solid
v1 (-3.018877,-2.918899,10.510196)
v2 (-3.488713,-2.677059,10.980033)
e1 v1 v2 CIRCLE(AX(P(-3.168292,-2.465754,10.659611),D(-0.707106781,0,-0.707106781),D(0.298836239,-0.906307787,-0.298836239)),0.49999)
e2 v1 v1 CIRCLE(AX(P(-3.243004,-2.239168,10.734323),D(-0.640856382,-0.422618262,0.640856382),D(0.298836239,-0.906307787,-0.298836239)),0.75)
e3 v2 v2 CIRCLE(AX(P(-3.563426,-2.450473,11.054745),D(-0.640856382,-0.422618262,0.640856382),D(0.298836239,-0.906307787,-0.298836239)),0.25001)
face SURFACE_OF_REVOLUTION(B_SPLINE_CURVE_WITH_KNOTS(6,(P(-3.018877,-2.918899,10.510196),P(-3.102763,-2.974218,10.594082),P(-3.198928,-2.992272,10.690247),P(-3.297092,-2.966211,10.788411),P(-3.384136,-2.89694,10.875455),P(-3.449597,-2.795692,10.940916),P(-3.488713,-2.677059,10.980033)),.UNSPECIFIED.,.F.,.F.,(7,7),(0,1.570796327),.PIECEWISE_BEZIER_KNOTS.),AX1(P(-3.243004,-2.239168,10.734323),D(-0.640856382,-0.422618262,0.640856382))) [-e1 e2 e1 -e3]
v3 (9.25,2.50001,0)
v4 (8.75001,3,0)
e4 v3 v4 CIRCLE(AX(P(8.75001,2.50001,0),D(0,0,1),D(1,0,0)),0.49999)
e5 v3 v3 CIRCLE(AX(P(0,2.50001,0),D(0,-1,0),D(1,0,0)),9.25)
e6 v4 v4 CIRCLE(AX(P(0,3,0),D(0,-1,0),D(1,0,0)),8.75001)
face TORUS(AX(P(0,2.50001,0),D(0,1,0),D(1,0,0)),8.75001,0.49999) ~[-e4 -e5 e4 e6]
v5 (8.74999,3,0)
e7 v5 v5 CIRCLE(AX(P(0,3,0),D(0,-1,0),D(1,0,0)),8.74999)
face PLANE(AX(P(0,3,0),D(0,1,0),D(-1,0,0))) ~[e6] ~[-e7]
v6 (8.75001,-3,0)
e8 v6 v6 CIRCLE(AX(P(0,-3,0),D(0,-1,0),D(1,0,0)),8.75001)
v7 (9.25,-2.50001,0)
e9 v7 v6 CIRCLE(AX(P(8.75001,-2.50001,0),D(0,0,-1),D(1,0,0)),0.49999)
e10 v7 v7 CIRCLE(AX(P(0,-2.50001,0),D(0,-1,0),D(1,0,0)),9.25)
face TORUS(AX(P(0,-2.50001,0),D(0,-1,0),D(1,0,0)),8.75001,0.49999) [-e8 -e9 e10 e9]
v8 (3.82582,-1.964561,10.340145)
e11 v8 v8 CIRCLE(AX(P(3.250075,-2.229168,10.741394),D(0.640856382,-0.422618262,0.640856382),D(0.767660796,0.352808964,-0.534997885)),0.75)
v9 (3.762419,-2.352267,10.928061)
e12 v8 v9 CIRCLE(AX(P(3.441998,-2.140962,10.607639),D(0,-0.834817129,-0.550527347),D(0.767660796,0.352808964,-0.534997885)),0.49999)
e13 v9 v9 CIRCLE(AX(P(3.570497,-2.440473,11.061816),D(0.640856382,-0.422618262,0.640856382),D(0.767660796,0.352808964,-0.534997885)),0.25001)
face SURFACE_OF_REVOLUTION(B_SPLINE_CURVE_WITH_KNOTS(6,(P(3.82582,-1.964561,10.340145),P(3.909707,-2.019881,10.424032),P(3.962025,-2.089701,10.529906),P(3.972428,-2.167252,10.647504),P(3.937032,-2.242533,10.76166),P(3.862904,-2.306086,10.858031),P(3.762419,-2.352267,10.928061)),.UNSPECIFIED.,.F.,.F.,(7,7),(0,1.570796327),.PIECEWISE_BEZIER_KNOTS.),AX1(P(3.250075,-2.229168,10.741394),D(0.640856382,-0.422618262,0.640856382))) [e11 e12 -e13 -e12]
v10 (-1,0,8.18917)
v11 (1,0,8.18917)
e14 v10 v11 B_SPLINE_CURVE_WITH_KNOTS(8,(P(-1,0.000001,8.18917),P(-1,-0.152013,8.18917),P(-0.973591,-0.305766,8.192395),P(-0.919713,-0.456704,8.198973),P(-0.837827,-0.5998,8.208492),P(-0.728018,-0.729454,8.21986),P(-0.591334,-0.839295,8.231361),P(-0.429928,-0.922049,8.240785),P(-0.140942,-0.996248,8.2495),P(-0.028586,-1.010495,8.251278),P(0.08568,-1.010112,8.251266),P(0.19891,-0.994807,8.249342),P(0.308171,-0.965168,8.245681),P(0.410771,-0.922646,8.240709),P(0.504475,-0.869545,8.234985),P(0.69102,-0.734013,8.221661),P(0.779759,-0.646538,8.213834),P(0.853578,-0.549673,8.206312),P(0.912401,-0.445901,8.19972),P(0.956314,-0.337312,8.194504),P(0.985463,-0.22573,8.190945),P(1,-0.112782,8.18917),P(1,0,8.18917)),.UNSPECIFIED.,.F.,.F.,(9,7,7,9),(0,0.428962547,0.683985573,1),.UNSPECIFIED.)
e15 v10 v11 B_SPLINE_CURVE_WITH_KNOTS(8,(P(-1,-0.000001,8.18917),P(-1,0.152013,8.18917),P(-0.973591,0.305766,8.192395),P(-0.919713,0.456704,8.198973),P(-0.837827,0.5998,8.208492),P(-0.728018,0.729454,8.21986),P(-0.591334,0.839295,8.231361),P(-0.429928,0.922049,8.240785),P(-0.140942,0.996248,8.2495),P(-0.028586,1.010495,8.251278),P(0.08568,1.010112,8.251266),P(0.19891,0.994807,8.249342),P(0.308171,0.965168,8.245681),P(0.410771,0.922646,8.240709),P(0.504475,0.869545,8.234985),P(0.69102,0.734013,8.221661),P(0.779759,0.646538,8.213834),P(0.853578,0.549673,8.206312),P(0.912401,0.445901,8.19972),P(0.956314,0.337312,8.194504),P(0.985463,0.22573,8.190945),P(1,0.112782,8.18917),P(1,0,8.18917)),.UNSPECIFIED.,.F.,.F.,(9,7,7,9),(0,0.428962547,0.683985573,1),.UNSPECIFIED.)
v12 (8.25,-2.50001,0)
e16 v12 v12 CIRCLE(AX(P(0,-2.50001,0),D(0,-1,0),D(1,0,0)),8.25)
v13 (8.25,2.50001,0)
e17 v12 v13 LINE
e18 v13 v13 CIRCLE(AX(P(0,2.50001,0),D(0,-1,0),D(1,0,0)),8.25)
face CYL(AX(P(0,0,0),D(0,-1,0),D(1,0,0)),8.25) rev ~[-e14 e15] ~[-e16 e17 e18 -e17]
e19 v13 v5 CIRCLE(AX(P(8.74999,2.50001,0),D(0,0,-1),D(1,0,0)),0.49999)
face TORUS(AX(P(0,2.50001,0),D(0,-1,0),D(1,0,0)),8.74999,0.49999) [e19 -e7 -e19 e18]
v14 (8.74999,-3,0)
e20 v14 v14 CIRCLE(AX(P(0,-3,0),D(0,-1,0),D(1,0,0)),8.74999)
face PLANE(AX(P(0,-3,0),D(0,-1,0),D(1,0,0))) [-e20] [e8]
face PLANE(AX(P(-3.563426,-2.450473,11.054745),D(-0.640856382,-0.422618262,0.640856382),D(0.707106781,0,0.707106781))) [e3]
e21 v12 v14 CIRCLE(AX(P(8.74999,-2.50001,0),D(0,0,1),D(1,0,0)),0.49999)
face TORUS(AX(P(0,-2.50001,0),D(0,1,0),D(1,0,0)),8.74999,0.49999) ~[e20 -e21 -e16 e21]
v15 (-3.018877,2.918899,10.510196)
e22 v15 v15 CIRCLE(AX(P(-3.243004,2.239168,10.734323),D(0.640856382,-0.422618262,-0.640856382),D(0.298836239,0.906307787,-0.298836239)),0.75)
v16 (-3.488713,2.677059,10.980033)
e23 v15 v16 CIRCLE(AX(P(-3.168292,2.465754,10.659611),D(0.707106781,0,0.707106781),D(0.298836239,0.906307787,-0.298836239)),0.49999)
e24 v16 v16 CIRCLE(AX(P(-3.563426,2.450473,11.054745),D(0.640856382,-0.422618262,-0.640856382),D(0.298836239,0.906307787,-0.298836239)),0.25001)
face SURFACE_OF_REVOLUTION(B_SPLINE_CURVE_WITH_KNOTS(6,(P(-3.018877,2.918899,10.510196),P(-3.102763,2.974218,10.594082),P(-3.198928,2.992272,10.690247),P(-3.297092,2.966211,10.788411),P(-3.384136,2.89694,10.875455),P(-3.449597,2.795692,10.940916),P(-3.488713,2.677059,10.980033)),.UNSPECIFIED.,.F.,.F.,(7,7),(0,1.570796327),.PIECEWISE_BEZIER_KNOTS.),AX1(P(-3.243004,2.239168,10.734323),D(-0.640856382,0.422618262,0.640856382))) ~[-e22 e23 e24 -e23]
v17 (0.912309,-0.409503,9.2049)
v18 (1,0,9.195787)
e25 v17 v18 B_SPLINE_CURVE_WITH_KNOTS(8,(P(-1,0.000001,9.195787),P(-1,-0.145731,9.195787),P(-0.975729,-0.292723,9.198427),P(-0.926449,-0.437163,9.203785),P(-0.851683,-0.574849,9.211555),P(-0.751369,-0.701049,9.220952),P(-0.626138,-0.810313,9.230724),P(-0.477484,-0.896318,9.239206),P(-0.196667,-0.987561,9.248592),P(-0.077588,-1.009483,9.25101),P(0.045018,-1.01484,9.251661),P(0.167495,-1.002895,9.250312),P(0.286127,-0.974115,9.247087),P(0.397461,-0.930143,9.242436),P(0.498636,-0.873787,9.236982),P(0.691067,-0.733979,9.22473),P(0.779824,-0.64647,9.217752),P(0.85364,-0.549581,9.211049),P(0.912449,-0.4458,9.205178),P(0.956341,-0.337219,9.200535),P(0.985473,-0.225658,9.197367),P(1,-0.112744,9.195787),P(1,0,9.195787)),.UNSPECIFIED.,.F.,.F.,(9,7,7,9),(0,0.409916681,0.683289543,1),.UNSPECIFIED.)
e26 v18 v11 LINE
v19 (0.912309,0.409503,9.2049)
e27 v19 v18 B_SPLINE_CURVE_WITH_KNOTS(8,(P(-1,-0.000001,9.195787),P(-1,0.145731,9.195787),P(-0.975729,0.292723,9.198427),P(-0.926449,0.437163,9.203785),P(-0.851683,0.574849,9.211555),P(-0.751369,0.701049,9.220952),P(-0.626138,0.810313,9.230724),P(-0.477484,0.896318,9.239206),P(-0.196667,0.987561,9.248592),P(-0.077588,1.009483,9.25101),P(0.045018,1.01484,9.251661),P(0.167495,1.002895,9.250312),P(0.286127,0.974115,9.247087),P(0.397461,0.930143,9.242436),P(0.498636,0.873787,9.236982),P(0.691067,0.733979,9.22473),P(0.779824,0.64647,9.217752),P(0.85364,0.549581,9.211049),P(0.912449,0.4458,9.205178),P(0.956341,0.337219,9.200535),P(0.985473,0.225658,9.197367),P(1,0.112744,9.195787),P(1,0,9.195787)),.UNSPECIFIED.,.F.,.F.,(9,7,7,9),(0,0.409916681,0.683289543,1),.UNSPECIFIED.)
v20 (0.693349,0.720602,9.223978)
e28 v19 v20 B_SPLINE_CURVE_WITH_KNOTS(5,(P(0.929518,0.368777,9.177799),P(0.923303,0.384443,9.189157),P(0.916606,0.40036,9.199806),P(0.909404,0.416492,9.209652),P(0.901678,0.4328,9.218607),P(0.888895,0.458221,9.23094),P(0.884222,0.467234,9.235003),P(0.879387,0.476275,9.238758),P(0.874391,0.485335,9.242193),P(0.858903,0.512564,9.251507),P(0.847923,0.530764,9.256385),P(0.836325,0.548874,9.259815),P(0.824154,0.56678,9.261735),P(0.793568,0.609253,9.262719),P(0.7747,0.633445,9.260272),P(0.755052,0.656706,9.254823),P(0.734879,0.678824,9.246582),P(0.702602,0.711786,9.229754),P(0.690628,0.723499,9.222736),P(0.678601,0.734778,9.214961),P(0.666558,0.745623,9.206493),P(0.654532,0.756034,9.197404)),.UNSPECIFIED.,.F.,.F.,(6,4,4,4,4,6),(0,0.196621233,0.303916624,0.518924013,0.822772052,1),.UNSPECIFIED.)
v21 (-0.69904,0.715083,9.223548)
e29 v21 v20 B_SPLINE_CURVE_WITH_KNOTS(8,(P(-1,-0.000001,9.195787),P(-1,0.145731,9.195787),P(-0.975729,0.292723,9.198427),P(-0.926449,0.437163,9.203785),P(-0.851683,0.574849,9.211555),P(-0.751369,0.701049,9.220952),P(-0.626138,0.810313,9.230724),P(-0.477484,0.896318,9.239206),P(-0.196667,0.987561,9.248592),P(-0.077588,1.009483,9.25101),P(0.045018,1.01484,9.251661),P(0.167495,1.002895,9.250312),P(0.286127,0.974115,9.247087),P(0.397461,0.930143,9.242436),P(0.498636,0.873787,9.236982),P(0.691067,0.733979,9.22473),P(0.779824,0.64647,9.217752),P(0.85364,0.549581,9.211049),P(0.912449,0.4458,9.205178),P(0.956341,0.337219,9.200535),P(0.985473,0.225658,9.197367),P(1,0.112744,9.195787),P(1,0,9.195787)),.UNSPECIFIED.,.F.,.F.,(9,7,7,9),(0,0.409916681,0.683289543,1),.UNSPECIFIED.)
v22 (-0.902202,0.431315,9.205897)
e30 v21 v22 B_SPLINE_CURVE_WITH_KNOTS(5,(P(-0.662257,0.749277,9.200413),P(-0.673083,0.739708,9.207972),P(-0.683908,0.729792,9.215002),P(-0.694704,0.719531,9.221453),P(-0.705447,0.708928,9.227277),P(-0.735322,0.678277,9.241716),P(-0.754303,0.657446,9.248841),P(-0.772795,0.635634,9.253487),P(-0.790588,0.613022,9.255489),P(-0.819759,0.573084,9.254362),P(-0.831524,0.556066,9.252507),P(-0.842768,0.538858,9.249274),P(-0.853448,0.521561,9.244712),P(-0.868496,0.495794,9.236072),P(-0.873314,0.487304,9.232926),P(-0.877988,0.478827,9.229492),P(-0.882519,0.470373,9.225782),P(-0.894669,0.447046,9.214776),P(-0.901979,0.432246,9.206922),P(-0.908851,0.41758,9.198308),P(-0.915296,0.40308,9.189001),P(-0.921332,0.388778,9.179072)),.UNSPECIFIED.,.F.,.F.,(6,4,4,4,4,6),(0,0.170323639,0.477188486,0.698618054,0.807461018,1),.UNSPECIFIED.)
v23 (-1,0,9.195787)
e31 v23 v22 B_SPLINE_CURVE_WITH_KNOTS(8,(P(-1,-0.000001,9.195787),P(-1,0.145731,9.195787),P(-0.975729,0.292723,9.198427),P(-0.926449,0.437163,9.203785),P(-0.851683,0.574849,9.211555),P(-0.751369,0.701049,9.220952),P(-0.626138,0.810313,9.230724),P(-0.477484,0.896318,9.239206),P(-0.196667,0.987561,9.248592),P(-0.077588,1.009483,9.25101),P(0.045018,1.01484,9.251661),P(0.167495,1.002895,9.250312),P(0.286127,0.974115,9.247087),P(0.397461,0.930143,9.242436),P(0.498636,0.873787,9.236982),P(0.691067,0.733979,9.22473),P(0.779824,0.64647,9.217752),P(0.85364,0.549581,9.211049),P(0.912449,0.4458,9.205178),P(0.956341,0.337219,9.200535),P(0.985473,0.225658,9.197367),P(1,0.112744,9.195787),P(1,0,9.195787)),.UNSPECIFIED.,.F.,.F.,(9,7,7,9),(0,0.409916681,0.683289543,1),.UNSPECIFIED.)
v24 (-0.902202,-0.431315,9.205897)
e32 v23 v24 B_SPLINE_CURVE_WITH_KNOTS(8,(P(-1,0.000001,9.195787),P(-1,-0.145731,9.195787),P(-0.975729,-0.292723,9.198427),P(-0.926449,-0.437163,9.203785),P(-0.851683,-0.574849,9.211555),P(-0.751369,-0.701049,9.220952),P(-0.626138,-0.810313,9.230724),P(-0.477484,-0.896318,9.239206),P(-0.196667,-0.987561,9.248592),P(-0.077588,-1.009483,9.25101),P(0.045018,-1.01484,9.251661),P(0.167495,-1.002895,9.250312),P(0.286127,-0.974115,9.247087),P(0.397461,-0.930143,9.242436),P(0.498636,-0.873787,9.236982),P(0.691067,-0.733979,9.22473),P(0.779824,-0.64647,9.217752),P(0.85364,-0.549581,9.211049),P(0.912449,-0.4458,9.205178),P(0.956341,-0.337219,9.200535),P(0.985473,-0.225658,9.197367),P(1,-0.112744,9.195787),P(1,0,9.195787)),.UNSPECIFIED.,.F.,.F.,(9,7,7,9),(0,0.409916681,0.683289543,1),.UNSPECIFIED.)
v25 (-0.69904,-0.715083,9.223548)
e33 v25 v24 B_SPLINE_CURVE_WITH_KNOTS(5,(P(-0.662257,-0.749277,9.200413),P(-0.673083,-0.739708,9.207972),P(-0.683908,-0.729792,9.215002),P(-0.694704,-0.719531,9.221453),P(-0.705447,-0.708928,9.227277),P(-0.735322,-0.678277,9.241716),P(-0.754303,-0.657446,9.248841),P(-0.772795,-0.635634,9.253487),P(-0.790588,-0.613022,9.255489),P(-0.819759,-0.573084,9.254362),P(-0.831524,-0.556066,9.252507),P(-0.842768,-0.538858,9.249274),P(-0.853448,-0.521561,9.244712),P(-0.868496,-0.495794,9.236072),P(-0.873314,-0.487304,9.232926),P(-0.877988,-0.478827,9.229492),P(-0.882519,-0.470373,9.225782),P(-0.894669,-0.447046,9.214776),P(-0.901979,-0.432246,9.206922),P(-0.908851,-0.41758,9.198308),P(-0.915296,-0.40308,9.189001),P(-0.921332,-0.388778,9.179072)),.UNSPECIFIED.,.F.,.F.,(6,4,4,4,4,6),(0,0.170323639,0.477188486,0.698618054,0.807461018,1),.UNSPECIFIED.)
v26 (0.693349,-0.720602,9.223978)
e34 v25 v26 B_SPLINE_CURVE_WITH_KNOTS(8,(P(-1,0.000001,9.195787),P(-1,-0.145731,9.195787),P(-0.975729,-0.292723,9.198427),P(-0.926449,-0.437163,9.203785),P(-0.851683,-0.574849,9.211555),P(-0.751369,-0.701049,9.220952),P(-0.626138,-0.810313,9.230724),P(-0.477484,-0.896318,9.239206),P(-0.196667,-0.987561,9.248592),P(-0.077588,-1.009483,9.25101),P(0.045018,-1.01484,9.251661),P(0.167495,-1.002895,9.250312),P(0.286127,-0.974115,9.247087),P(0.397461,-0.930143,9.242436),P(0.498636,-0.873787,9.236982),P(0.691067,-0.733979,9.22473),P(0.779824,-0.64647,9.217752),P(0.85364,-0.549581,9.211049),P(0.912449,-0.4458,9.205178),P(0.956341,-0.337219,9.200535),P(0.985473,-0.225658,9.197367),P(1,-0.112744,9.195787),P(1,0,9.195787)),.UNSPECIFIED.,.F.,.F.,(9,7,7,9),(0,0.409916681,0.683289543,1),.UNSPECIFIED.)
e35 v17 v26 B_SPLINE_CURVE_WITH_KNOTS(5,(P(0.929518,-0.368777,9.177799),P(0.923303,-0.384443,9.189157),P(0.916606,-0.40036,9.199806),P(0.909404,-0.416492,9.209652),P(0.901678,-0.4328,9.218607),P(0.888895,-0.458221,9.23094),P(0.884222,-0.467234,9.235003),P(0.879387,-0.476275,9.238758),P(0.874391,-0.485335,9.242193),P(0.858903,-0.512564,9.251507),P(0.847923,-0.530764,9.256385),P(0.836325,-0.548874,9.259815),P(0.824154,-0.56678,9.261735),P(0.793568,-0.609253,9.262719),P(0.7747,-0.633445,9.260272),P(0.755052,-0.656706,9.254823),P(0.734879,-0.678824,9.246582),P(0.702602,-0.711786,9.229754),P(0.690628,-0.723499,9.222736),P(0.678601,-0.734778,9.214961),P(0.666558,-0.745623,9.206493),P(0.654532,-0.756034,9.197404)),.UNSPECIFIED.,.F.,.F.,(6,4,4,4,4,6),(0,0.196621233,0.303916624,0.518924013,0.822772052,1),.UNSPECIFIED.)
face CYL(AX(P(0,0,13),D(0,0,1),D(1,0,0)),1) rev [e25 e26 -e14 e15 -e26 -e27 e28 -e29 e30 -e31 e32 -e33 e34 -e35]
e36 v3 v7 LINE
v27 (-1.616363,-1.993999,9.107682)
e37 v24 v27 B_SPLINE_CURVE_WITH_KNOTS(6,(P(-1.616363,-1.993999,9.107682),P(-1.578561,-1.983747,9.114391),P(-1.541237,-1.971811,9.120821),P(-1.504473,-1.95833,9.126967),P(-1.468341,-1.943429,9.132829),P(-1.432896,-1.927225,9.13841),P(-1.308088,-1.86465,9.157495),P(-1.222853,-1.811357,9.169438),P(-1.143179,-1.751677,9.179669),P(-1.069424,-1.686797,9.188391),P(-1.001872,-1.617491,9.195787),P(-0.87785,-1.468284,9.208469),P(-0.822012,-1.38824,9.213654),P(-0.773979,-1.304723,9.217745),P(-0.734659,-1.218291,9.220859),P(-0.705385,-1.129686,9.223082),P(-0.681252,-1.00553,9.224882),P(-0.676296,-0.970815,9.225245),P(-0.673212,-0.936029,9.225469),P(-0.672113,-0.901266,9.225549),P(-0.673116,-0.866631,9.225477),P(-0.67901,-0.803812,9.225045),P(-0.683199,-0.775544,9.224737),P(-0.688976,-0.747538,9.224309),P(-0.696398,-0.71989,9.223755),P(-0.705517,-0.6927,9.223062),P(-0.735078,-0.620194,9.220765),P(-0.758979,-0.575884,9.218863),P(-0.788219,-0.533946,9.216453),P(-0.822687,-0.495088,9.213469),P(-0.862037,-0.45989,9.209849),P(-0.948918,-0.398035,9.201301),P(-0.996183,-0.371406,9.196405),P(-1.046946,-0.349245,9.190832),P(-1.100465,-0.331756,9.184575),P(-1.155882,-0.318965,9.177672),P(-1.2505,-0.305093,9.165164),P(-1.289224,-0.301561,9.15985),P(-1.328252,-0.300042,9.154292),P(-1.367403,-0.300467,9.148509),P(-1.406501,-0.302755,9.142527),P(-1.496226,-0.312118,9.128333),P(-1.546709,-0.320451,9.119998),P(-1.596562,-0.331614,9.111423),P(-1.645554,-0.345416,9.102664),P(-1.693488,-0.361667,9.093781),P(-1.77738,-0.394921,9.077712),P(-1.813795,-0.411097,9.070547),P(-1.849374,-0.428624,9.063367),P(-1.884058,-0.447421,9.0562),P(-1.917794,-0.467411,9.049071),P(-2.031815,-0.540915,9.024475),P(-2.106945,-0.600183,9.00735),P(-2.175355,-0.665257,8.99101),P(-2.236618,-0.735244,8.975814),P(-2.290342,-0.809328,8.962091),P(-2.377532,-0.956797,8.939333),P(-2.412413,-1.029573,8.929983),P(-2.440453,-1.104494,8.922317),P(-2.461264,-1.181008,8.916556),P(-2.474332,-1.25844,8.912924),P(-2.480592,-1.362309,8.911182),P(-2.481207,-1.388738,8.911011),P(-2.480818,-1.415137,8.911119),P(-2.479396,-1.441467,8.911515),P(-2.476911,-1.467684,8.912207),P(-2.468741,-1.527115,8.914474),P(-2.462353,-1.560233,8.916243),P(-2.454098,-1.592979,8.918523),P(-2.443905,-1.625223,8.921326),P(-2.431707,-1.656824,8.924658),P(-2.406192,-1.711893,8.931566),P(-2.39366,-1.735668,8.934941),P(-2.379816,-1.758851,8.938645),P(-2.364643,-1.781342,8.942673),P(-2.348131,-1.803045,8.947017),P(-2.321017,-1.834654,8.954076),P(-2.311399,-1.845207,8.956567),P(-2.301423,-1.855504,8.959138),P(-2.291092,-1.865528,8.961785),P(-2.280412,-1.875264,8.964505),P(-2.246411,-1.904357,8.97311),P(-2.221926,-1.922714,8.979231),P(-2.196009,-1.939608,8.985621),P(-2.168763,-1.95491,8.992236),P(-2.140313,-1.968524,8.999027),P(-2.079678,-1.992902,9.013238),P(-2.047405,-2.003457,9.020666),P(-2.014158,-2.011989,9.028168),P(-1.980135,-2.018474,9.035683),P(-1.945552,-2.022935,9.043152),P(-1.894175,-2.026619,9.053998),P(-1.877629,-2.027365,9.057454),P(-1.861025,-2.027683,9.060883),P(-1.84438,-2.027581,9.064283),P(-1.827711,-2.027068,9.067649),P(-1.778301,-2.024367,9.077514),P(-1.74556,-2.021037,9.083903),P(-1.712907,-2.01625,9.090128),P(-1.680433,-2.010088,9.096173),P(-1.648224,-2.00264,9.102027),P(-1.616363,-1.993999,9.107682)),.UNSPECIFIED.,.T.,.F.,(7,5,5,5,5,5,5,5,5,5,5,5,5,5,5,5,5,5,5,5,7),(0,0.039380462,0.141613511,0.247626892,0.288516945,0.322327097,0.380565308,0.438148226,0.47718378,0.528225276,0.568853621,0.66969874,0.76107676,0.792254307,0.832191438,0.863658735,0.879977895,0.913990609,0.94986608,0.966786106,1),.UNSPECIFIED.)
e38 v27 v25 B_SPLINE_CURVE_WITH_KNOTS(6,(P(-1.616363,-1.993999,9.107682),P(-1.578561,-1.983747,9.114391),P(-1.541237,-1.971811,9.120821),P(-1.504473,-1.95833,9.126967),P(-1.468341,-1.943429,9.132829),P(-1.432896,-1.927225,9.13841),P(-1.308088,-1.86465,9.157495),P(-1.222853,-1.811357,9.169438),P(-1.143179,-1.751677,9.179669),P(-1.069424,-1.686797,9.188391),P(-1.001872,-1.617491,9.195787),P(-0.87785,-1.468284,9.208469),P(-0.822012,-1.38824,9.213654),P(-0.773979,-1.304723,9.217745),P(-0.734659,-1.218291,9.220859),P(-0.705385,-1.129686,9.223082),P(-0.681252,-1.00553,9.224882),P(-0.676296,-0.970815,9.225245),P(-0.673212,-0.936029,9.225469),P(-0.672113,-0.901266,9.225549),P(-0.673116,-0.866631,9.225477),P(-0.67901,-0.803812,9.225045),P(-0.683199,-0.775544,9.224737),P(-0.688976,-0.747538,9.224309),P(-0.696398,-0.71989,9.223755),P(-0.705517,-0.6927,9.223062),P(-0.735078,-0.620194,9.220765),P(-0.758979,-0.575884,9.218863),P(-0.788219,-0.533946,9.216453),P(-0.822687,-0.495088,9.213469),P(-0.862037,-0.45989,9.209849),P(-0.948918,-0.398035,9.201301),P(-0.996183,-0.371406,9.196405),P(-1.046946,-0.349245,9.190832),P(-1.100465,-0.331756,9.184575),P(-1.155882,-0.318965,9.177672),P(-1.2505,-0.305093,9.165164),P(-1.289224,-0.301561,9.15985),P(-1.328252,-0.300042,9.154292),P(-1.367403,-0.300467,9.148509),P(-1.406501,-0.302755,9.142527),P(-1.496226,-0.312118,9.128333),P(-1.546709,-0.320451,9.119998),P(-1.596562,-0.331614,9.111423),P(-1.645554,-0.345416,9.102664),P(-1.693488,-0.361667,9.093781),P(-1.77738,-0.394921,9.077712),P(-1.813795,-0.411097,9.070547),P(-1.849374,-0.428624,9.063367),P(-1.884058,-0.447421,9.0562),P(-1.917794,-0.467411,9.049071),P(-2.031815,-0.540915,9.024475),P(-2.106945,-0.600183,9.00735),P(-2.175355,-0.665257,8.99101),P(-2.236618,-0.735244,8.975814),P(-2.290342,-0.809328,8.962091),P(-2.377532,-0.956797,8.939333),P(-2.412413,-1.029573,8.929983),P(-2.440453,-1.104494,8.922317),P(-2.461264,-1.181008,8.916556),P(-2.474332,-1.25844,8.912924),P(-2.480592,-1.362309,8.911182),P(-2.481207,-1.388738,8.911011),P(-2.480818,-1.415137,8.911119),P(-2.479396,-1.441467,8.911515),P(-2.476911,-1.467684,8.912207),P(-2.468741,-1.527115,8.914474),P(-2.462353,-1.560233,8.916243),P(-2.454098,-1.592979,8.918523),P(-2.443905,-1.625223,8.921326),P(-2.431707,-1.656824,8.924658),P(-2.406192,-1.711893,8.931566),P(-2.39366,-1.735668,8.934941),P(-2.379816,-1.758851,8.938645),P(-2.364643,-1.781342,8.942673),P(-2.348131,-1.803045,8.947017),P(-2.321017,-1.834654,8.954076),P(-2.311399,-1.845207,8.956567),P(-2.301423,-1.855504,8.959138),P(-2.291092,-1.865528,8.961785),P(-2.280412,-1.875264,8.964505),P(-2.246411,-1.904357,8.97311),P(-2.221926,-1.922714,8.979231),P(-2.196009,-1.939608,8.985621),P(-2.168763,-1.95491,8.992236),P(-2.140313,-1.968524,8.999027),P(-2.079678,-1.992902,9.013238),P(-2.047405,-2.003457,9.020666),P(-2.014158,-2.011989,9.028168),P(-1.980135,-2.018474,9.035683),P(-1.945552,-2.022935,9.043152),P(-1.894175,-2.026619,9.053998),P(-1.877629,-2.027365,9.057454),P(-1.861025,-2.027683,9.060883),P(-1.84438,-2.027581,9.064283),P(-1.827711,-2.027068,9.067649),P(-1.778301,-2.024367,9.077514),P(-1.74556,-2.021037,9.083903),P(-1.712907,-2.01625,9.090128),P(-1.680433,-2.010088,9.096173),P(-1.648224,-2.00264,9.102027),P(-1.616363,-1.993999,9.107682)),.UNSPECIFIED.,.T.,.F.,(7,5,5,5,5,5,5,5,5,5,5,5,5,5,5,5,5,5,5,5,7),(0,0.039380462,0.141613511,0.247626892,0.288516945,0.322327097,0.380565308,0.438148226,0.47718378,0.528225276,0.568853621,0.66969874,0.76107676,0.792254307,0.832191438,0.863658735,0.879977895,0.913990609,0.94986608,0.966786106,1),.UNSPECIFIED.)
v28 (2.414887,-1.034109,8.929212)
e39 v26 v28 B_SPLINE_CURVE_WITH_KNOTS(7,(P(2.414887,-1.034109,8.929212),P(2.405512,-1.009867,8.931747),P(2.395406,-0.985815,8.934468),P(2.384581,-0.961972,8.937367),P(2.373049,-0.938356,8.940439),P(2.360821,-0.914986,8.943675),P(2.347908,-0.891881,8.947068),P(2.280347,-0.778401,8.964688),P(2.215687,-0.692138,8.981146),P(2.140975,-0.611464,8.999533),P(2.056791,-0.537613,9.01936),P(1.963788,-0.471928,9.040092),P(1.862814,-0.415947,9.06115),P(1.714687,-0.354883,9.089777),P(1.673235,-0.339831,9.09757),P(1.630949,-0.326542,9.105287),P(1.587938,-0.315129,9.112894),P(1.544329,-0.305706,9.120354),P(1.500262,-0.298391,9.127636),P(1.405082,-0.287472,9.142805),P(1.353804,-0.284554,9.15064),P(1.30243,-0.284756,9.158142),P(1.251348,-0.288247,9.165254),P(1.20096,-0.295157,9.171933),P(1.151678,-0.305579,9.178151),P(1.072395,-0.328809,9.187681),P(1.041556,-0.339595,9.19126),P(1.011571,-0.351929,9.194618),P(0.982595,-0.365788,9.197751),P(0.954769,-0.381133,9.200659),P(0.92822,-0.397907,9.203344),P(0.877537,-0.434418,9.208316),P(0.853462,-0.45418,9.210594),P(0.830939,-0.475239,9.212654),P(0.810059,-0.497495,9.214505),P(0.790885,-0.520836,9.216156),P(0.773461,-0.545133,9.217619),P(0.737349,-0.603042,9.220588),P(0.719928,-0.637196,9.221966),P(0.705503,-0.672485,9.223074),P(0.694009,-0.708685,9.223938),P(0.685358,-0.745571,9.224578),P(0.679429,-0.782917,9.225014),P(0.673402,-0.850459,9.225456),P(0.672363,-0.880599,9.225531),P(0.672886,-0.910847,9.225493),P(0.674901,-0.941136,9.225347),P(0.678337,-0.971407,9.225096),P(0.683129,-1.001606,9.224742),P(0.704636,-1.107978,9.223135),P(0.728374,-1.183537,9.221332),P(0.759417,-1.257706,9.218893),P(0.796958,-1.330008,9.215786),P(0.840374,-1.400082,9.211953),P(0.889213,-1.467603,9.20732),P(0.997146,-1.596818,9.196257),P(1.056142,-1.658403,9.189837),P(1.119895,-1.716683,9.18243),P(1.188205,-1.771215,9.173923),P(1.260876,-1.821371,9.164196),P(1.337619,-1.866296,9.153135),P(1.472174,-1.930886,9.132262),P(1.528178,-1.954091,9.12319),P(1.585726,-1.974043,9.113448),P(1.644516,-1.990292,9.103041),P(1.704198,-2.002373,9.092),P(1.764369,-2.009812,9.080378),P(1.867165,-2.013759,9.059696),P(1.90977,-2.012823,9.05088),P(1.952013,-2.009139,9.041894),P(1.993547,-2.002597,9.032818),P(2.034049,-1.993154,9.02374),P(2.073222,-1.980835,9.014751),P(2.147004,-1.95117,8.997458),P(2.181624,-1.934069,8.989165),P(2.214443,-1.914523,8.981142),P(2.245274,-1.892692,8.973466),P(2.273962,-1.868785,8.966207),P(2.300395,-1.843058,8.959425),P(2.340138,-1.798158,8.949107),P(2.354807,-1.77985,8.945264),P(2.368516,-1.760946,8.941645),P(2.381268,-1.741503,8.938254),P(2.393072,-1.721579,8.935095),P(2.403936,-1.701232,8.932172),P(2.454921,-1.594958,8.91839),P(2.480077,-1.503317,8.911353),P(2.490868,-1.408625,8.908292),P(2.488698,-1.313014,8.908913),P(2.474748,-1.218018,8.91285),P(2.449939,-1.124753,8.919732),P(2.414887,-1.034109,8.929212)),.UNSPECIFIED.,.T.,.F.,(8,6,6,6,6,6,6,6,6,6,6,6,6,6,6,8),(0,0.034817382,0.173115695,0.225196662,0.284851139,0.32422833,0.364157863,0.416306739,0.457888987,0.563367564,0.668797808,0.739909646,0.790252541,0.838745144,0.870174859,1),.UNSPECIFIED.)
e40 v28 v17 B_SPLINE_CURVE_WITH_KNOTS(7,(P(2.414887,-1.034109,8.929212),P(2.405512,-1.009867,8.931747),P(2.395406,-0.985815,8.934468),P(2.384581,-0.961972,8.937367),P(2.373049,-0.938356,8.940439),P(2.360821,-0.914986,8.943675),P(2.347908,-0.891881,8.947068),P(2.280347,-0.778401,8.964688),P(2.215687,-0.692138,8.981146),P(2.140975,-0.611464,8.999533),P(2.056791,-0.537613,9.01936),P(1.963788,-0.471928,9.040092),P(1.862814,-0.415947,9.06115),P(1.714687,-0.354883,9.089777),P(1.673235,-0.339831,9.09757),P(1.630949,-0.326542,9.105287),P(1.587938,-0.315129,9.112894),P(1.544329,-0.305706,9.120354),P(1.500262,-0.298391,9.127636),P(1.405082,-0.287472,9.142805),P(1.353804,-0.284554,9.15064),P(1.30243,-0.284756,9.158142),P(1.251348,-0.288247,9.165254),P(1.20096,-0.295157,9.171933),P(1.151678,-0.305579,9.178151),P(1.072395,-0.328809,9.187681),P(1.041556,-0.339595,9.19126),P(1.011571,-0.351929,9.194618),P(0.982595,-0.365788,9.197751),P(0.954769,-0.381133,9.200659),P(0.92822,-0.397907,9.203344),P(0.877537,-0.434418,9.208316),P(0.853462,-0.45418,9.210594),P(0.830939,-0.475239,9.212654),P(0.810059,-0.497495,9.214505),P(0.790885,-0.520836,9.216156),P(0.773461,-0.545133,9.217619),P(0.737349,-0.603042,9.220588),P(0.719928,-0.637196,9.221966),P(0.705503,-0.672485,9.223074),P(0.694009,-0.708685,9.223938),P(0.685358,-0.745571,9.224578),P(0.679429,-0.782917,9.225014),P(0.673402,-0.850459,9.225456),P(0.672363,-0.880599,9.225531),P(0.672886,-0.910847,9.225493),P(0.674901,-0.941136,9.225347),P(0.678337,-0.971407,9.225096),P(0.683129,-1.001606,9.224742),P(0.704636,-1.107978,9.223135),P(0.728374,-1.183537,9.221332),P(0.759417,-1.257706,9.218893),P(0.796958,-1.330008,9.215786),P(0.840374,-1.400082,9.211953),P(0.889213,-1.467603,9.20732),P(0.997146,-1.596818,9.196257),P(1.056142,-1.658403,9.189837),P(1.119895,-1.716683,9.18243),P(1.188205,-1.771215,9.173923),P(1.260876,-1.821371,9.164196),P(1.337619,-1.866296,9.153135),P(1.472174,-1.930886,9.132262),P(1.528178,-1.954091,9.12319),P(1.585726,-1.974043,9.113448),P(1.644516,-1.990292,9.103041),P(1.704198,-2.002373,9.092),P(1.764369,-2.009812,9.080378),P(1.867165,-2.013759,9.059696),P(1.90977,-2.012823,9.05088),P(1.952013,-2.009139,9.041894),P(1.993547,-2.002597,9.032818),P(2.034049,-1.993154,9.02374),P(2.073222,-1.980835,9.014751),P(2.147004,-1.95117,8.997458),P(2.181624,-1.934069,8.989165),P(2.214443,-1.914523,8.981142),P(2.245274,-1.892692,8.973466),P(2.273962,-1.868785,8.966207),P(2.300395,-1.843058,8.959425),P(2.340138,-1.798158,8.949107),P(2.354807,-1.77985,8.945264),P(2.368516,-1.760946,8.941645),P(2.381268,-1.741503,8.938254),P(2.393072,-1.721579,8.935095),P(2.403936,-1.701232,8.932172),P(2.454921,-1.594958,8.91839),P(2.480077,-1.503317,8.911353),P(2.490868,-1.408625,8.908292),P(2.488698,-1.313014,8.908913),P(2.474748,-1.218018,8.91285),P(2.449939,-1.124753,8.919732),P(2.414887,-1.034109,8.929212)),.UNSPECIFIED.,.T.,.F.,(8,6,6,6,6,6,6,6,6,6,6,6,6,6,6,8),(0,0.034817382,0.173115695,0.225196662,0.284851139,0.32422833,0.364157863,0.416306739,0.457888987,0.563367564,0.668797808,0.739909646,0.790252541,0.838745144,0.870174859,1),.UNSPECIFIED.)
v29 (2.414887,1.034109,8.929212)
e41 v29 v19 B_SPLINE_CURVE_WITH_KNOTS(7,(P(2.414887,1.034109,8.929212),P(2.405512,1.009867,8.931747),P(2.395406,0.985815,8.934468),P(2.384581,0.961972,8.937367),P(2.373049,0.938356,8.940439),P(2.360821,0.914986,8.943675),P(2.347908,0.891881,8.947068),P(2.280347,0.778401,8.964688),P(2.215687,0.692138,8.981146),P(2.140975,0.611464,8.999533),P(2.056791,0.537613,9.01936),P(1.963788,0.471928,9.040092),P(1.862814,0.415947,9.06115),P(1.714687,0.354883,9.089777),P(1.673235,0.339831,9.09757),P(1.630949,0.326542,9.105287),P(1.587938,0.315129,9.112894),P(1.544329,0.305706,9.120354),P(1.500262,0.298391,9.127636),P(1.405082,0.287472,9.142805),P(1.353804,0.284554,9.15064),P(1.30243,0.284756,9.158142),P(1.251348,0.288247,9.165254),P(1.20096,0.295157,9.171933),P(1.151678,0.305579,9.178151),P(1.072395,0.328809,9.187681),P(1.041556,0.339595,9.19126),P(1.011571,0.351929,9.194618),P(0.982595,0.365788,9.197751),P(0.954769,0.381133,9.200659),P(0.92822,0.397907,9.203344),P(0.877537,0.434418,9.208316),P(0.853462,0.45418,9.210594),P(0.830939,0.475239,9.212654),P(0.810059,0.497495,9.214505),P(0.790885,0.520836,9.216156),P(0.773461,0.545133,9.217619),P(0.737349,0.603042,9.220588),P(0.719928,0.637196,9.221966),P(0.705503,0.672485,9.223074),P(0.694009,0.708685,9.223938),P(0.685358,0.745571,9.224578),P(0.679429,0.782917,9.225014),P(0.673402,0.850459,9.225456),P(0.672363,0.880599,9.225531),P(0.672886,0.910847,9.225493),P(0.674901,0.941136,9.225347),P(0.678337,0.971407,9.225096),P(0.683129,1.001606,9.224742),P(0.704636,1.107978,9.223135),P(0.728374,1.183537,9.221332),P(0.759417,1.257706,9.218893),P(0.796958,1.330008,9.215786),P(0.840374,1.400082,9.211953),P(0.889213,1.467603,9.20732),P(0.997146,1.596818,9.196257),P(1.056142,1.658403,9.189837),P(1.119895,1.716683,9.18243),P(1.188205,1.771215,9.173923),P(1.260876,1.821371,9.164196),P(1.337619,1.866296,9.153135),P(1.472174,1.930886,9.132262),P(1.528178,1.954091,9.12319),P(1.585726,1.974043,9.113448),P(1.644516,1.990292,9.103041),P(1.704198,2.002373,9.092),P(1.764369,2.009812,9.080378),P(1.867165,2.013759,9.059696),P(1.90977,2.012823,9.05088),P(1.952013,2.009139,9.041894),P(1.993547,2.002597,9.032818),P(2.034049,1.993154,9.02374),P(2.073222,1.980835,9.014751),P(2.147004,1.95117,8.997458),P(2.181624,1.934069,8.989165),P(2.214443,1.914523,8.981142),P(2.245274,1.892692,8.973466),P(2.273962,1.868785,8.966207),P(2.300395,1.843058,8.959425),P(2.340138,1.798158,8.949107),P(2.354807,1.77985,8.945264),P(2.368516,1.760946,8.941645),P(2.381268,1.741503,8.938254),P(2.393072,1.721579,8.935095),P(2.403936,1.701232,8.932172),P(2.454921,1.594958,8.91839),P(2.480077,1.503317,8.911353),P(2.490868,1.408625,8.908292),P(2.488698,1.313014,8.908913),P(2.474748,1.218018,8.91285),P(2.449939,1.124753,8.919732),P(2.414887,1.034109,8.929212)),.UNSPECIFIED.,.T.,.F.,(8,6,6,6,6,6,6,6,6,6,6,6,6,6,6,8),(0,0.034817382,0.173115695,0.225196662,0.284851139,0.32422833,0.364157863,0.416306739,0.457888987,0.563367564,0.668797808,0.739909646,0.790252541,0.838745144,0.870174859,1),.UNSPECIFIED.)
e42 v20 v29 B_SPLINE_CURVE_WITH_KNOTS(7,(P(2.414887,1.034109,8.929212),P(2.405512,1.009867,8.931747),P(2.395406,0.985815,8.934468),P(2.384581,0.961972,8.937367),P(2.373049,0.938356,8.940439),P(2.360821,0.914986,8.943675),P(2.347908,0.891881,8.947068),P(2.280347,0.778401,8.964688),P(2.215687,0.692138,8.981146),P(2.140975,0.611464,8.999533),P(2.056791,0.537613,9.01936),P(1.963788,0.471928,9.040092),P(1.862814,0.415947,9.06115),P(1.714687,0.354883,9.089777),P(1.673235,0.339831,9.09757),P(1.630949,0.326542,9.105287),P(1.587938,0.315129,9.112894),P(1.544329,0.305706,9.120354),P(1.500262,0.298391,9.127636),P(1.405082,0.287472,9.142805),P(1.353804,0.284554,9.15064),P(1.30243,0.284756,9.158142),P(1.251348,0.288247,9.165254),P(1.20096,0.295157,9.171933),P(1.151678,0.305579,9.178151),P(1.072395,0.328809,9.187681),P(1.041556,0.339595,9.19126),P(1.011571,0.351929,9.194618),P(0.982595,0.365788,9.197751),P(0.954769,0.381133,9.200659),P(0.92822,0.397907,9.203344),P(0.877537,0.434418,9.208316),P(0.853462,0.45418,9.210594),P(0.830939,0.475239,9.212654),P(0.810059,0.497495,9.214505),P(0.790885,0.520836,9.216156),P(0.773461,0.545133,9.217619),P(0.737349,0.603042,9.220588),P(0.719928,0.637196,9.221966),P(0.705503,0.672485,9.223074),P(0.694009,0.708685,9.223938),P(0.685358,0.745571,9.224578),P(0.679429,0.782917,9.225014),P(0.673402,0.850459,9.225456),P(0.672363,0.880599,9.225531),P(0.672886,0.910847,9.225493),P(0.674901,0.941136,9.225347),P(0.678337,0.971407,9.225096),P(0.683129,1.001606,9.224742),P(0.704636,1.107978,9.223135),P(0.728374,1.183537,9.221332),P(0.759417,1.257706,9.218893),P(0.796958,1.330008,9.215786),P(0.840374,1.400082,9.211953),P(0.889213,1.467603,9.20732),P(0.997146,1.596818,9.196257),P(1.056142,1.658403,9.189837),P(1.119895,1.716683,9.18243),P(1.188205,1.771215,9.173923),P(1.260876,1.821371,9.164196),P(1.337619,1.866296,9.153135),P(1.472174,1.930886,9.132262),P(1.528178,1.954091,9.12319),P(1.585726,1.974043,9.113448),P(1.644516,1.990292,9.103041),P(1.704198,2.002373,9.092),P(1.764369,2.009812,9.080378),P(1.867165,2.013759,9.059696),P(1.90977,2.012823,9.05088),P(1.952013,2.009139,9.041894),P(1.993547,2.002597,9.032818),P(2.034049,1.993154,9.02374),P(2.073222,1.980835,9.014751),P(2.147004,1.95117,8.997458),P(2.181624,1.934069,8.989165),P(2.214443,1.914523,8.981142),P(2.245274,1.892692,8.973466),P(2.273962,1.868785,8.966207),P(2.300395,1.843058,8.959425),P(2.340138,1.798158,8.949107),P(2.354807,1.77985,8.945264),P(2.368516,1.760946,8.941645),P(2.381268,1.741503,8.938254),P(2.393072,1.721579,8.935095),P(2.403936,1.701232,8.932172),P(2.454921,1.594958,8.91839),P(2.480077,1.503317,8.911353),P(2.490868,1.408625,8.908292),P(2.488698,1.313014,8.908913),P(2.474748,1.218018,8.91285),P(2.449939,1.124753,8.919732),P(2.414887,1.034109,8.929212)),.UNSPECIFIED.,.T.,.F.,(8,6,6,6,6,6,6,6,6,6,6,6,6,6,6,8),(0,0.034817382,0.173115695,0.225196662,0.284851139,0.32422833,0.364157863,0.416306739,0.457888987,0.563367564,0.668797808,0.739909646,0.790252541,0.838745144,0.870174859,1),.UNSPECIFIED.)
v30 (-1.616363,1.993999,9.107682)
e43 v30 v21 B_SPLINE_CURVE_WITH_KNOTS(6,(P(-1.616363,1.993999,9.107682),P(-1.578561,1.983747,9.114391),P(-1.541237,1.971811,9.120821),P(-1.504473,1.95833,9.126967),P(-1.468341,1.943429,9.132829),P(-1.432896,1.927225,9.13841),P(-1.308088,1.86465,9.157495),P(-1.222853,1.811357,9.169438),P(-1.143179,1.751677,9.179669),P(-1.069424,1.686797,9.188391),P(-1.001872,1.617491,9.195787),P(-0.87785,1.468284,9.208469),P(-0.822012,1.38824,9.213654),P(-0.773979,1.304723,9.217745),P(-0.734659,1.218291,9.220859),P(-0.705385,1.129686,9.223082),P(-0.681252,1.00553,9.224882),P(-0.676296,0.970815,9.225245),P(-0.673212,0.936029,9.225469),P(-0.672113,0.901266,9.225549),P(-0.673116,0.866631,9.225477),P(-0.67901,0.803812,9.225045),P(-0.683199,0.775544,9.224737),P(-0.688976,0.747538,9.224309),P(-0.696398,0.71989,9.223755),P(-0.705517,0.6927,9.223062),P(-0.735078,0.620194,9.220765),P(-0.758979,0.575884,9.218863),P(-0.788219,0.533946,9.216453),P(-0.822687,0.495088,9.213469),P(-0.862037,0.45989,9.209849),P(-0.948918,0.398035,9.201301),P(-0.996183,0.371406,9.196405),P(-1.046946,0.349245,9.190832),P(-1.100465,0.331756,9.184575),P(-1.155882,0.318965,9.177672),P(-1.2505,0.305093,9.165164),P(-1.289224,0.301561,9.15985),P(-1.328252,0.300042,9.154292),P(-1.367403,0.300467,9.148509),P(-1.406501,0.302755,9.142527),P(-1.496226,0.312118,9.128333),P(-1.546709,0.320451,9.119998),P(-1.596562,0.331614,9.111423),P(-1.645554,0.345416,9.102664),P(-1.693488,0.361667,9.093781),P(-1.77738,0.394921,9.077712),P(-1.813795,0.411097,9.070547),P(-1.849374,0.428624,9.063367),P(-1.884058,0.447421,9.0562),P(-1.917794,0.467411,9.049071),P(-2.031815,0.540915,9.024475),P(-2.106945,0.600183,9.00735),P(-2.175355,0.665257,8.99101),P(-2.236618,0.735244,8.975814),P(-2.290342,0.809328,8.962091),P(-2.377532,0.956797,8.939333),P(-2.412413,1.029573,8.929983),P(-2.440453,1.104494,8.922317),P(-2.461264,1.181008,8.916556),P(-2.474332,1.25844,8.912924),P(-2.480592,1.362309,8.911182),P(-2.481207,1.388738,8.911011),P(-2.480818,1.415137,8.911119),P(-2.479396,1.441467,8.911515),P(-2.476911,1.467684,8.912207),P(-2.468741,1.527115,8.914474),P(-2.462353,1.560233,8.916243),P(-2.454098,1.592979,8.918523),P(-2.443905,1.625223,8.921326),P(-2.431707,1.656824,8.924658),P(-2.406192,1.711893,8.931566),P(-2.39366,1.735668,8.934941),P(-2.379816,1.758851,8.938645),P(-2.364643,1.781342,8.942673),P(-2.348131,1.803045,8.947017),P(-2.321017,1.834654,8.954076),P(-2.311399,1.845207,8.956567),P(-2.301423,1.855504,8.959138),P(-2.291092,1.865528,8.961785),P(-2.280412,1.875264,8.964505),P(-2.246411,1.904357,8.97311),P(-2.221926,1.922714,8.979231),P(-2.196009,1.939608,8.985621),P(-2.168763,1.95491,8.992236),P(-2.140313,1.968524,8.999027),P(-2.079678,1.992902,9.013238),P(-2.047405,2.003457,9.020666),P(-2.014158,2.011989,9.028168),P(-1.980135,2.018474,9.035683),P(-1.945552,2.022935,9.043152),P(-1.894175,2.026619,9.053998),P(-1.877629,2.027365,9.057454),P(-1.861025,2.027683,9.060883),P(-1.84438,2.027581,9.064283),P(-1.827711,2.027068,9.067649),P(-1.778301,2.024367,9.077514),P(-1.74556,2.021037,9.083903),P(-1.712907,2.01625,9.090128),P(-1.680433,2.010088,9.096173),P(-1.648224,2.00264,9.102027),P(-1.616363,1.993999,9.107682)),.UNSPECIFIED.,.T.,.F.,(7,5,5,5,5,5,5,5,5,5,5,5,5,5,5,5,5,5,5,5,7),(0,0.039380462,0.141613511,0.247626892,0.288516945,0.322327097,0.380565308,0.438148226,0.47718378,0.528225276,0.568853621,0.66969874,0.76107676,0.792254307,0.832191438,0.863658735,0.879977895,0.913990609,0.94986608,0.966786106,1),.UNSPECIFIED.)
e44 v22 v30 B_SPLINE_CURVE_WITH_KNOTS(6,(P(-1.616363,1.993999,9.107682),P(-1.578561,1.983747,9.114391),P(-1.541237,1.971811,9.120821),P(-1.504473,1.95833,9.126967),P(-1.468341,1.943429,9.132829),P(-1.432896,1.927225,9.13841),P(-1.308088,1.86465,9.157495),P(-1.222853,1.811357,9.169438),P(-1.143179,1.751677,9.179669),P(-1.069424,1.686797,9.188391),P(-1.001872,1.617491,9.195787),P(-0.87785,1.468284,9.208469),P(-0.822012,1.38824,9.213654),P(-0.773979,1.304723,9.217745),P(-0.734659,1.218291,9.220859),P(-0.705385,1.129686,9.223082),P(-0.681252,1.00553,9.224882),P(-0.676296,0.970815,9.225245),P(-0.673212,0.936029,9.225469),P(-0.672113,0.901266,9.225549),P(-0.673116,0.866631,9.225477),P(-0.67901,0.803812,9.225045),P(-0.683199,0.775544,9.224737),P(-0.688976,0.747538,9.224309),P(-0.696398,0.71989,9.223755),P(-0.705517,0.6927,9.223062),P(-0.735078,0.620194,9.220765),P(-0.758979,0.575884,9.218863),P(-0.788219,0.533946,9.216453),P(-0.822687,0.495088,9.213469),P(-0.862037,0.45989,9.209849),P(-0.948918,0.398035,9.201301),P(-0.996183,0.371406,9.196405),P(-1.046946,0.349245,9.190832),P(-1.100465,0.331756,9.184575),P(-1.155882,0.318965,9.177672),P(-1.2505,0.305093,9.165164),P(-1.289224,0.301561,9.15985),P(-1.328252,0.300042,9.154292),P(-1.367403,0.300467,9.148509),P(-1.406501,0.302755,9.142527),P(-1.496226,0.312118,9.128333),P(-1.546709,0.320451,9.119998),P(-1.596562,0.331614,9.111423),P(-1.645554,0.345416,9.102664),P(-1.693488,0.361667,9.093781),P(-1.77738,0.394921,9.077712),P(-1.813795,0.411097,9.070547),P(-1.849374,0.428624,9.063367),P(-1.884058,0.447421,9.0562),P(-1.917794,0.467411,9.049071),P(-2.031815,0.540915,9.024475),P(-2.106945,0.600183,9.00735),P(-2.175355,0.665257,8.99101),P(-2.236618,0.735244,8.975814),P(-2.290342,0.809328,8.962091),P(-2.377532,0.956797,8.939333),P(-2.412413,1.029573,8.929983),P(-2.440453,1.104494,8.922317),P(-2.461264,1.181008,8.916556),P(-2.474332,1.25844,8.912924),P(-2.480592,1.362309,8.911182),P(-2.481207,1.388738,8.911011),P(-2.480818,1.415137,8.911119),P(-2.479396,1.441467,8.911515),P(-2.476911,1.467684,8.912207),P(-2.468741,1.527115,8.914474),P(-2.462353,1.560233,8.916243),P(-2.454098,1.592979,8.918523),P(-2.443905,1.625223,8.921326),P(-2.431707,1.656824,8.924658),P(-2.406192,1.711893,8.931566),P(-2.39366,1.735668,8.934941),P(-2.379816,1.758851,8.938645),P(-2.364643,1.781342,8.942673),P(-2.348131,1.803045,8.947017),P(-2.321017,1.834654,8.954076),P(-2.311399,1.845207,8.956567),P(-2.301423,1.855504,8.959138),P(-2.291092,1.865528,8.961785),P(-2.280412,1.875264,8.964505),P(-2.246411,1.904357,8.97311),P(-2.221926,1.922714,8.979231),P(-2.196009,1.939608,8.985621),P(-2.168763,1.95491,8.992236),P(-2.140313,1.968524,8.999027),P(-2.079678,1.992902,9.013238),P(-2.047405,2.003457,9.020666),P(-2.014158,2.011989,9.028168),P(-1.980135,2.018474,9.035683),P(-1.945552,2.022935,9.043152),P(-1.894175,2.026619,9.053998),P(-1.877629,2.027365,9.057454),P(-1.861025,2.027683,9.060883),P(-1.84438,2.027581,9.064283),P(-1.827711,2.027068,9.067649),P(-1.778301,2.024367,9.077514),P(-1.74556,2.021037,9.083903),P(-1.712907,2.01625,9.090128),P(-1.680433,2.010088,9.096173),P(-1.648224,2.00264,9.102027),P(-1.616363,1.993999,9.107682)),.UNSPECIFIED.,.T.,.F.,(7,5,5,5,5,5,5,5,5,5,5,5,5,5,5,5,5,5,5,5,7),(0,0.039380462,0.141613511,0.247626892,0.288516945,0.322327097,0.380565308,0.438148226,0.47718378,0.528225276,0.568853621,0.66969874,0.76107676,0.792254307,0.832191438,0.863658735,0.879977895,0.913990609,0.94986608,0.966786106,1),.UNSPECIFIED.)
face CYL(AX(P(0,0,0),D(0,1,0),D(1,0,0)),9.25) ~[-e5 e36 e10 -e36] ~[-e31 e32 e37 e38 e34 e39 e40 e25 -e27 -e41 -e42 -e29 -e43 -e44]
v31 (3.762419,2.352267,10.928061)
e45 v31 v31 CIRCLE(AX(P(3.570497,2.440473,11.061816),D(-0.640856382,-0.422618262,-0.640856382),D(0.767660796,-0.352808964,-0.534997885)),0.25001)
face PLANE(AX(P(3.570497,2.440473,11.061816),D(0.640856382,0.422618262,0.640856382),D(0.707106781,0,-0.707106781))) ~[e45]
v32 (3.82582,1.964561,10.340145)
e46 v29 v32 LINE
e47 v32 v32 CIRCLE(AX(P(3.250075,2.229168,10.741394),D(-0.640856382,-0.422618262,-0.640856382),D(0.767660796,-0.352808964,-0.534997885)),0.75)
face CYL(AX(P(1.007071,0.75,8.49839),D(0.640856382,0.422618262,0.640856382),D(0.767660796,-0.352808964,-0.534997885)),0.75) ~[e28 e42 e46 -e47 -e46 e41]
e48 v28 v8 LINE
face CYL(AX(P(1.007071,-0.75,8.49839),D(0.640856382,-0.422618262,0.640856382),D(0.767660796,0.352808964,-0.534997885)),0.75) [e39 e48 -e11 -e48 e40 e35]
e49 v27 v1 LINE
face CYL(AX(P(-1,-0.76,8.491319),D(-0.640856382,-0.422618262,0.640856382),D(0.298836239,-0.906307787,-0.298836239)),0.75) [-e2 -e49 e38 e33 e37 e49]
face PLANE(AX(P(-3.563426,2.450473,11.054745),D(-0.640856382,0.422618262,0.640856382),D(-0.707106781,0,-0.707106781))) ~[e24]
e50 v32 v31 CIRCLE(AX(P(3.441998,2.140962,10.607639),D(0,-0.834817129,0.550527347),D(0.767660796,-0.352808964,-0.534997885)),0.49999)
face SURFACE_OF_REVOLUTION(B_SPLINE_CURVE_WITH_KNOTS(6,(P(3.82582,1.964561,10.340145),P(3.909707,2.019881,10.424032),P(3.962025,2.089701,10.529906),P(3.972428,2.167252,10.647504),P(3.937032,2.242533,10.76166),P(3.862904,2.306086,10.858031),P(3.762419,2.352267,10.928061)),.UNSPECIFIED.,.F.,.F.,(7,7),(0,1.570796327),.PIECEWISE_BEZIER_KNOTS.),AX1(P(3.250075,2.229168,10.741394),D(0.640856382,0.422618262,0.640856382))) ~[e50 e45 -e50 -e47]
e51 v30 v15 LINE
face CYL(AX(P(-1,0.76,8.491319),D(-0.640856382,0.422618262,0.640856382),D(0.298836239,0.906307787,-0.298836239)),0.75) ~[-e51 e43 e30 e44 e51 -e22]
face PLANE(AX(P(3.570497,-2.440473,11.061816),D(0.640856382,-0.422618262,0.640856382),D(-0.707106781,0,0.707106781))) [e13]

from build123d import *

# Parameters (mm, degrees)
F0_R      = 9.25
F0_R_2    = 8.25
F1_DEPTH  = 3
F10_R     = 0.75
F11_R     = 0.75
F15_R     = 1
F16_DEPTH = 9
F18_R     = 8.25
F19_DEPTH = 25
F20_R     = 0.49999


# Not quite as in the source:
# - a fillet or chamfer is up to 0.001 mm smaller than in the source, because OpenCascade refuses the exact size


with BuildPart() as f1:
    # F0 (on Front) → F1 (new body)
    with BuildSketch(Plane.XZ):
        Circle(F0_R)
        Circle(F0_R_2, mode=Mode.SUBTRACT)
    extrude(amount=F1_DEPTH)

    # F12: sweep along a path in F6
    with BuildLine(Plane(origin=(-3.7456595483, 0, 3.7456595483), x_dir=(0, 1, 0), z_dir=(0.7071067812, 0, -0.7071067812))) as f12_path:
        Line((-0.75, 6.7213760956), (-2.440473047, 10.3466072437))
    # F10 (on line) → F12 (sweep)
    with BuildSketch(Plane(origin=(6.67041722, -4.3988640974, 6.67041722), x_dir=(0.7676607959, 0.3528089641, -0.5349978853), z_dir=(0.6408563821, -0.4226182617, 0.6408563821))):
        with Locations((-4.0381385118, 4.052483348)):
            Circle(F10_R)
    sweep(path=f12_path.line)

    # F13: sweep along a path in F7
    with BuildLine(Plane(origin=(3.7456595483, 0, 3.7456595483), x_dir=(0.7071067812, 0, -0.7071067812), z_dir=(-0.7071067812, 0, -0.7071067812))) as f13_path:
        Line((-6.7113760956, 0.76), (-10.3366072437, 2.450473047))
    # F11 (on line) → F13 (sweep)
    with BuildSketch(Plane(origin=(-6.6673174648, -4.3968199371, 6.6673174648), x_dir=(0.2988362387, -0.906307787, -0.2988362387), z_dir=(-0.6408563821, -0.4226182617, 0.6408563821))):
        with Locations((-2.1475561813, 5.2971625332)):
            Circle(F11_R)
    sweep(path=f13_path.line)

    # F15 (on offset) → F16 (cut)
    with BuildSketch(Plane.XY.offset(13)):
        Circle(F15_R)
    extrude(amount=-F16_DEPTH, mode=Mode.SUBTRACT)

    # F17: F1 across face


with BuildPart() as f1_1:
    add(f1.part)
    add(f1.part.mirror(Plane(origin=(0, 0, -0.3303539974), x_dir=(1, 0, 0), z_dir=(0, 1, 0))))

    # F18 (on face) → F19 (cut)
    with BuildSketch(Plane.XZ.offset(3)):
        Circle(F18_R)
    extrude(amount=-F19_DEPTH, mode=Mode.SUBTRACT)

    # F20 (radius 0.5 in the source; OpenCascade refuses exactly that, so slightly less here)
    f20_edges = [f1_1.edges().sort_by_distance(p)[0] for p in [
        (-9.25, -3, 0),
        (-8.25, -3, 0),
        (-9.25, 3, 0),
        (-8.25, 3, 0),
        (2.994751, 2.70508, 11.463064),
        (2.994751, -2.70508, 11.463064),
        (-3.787553, -1.770742, 11.278872),
        (-3.787553, 1.770742, 11.278872),
    ]]
    fillet(f20_edges, radius=F20_R)


solid = f1_1.part
